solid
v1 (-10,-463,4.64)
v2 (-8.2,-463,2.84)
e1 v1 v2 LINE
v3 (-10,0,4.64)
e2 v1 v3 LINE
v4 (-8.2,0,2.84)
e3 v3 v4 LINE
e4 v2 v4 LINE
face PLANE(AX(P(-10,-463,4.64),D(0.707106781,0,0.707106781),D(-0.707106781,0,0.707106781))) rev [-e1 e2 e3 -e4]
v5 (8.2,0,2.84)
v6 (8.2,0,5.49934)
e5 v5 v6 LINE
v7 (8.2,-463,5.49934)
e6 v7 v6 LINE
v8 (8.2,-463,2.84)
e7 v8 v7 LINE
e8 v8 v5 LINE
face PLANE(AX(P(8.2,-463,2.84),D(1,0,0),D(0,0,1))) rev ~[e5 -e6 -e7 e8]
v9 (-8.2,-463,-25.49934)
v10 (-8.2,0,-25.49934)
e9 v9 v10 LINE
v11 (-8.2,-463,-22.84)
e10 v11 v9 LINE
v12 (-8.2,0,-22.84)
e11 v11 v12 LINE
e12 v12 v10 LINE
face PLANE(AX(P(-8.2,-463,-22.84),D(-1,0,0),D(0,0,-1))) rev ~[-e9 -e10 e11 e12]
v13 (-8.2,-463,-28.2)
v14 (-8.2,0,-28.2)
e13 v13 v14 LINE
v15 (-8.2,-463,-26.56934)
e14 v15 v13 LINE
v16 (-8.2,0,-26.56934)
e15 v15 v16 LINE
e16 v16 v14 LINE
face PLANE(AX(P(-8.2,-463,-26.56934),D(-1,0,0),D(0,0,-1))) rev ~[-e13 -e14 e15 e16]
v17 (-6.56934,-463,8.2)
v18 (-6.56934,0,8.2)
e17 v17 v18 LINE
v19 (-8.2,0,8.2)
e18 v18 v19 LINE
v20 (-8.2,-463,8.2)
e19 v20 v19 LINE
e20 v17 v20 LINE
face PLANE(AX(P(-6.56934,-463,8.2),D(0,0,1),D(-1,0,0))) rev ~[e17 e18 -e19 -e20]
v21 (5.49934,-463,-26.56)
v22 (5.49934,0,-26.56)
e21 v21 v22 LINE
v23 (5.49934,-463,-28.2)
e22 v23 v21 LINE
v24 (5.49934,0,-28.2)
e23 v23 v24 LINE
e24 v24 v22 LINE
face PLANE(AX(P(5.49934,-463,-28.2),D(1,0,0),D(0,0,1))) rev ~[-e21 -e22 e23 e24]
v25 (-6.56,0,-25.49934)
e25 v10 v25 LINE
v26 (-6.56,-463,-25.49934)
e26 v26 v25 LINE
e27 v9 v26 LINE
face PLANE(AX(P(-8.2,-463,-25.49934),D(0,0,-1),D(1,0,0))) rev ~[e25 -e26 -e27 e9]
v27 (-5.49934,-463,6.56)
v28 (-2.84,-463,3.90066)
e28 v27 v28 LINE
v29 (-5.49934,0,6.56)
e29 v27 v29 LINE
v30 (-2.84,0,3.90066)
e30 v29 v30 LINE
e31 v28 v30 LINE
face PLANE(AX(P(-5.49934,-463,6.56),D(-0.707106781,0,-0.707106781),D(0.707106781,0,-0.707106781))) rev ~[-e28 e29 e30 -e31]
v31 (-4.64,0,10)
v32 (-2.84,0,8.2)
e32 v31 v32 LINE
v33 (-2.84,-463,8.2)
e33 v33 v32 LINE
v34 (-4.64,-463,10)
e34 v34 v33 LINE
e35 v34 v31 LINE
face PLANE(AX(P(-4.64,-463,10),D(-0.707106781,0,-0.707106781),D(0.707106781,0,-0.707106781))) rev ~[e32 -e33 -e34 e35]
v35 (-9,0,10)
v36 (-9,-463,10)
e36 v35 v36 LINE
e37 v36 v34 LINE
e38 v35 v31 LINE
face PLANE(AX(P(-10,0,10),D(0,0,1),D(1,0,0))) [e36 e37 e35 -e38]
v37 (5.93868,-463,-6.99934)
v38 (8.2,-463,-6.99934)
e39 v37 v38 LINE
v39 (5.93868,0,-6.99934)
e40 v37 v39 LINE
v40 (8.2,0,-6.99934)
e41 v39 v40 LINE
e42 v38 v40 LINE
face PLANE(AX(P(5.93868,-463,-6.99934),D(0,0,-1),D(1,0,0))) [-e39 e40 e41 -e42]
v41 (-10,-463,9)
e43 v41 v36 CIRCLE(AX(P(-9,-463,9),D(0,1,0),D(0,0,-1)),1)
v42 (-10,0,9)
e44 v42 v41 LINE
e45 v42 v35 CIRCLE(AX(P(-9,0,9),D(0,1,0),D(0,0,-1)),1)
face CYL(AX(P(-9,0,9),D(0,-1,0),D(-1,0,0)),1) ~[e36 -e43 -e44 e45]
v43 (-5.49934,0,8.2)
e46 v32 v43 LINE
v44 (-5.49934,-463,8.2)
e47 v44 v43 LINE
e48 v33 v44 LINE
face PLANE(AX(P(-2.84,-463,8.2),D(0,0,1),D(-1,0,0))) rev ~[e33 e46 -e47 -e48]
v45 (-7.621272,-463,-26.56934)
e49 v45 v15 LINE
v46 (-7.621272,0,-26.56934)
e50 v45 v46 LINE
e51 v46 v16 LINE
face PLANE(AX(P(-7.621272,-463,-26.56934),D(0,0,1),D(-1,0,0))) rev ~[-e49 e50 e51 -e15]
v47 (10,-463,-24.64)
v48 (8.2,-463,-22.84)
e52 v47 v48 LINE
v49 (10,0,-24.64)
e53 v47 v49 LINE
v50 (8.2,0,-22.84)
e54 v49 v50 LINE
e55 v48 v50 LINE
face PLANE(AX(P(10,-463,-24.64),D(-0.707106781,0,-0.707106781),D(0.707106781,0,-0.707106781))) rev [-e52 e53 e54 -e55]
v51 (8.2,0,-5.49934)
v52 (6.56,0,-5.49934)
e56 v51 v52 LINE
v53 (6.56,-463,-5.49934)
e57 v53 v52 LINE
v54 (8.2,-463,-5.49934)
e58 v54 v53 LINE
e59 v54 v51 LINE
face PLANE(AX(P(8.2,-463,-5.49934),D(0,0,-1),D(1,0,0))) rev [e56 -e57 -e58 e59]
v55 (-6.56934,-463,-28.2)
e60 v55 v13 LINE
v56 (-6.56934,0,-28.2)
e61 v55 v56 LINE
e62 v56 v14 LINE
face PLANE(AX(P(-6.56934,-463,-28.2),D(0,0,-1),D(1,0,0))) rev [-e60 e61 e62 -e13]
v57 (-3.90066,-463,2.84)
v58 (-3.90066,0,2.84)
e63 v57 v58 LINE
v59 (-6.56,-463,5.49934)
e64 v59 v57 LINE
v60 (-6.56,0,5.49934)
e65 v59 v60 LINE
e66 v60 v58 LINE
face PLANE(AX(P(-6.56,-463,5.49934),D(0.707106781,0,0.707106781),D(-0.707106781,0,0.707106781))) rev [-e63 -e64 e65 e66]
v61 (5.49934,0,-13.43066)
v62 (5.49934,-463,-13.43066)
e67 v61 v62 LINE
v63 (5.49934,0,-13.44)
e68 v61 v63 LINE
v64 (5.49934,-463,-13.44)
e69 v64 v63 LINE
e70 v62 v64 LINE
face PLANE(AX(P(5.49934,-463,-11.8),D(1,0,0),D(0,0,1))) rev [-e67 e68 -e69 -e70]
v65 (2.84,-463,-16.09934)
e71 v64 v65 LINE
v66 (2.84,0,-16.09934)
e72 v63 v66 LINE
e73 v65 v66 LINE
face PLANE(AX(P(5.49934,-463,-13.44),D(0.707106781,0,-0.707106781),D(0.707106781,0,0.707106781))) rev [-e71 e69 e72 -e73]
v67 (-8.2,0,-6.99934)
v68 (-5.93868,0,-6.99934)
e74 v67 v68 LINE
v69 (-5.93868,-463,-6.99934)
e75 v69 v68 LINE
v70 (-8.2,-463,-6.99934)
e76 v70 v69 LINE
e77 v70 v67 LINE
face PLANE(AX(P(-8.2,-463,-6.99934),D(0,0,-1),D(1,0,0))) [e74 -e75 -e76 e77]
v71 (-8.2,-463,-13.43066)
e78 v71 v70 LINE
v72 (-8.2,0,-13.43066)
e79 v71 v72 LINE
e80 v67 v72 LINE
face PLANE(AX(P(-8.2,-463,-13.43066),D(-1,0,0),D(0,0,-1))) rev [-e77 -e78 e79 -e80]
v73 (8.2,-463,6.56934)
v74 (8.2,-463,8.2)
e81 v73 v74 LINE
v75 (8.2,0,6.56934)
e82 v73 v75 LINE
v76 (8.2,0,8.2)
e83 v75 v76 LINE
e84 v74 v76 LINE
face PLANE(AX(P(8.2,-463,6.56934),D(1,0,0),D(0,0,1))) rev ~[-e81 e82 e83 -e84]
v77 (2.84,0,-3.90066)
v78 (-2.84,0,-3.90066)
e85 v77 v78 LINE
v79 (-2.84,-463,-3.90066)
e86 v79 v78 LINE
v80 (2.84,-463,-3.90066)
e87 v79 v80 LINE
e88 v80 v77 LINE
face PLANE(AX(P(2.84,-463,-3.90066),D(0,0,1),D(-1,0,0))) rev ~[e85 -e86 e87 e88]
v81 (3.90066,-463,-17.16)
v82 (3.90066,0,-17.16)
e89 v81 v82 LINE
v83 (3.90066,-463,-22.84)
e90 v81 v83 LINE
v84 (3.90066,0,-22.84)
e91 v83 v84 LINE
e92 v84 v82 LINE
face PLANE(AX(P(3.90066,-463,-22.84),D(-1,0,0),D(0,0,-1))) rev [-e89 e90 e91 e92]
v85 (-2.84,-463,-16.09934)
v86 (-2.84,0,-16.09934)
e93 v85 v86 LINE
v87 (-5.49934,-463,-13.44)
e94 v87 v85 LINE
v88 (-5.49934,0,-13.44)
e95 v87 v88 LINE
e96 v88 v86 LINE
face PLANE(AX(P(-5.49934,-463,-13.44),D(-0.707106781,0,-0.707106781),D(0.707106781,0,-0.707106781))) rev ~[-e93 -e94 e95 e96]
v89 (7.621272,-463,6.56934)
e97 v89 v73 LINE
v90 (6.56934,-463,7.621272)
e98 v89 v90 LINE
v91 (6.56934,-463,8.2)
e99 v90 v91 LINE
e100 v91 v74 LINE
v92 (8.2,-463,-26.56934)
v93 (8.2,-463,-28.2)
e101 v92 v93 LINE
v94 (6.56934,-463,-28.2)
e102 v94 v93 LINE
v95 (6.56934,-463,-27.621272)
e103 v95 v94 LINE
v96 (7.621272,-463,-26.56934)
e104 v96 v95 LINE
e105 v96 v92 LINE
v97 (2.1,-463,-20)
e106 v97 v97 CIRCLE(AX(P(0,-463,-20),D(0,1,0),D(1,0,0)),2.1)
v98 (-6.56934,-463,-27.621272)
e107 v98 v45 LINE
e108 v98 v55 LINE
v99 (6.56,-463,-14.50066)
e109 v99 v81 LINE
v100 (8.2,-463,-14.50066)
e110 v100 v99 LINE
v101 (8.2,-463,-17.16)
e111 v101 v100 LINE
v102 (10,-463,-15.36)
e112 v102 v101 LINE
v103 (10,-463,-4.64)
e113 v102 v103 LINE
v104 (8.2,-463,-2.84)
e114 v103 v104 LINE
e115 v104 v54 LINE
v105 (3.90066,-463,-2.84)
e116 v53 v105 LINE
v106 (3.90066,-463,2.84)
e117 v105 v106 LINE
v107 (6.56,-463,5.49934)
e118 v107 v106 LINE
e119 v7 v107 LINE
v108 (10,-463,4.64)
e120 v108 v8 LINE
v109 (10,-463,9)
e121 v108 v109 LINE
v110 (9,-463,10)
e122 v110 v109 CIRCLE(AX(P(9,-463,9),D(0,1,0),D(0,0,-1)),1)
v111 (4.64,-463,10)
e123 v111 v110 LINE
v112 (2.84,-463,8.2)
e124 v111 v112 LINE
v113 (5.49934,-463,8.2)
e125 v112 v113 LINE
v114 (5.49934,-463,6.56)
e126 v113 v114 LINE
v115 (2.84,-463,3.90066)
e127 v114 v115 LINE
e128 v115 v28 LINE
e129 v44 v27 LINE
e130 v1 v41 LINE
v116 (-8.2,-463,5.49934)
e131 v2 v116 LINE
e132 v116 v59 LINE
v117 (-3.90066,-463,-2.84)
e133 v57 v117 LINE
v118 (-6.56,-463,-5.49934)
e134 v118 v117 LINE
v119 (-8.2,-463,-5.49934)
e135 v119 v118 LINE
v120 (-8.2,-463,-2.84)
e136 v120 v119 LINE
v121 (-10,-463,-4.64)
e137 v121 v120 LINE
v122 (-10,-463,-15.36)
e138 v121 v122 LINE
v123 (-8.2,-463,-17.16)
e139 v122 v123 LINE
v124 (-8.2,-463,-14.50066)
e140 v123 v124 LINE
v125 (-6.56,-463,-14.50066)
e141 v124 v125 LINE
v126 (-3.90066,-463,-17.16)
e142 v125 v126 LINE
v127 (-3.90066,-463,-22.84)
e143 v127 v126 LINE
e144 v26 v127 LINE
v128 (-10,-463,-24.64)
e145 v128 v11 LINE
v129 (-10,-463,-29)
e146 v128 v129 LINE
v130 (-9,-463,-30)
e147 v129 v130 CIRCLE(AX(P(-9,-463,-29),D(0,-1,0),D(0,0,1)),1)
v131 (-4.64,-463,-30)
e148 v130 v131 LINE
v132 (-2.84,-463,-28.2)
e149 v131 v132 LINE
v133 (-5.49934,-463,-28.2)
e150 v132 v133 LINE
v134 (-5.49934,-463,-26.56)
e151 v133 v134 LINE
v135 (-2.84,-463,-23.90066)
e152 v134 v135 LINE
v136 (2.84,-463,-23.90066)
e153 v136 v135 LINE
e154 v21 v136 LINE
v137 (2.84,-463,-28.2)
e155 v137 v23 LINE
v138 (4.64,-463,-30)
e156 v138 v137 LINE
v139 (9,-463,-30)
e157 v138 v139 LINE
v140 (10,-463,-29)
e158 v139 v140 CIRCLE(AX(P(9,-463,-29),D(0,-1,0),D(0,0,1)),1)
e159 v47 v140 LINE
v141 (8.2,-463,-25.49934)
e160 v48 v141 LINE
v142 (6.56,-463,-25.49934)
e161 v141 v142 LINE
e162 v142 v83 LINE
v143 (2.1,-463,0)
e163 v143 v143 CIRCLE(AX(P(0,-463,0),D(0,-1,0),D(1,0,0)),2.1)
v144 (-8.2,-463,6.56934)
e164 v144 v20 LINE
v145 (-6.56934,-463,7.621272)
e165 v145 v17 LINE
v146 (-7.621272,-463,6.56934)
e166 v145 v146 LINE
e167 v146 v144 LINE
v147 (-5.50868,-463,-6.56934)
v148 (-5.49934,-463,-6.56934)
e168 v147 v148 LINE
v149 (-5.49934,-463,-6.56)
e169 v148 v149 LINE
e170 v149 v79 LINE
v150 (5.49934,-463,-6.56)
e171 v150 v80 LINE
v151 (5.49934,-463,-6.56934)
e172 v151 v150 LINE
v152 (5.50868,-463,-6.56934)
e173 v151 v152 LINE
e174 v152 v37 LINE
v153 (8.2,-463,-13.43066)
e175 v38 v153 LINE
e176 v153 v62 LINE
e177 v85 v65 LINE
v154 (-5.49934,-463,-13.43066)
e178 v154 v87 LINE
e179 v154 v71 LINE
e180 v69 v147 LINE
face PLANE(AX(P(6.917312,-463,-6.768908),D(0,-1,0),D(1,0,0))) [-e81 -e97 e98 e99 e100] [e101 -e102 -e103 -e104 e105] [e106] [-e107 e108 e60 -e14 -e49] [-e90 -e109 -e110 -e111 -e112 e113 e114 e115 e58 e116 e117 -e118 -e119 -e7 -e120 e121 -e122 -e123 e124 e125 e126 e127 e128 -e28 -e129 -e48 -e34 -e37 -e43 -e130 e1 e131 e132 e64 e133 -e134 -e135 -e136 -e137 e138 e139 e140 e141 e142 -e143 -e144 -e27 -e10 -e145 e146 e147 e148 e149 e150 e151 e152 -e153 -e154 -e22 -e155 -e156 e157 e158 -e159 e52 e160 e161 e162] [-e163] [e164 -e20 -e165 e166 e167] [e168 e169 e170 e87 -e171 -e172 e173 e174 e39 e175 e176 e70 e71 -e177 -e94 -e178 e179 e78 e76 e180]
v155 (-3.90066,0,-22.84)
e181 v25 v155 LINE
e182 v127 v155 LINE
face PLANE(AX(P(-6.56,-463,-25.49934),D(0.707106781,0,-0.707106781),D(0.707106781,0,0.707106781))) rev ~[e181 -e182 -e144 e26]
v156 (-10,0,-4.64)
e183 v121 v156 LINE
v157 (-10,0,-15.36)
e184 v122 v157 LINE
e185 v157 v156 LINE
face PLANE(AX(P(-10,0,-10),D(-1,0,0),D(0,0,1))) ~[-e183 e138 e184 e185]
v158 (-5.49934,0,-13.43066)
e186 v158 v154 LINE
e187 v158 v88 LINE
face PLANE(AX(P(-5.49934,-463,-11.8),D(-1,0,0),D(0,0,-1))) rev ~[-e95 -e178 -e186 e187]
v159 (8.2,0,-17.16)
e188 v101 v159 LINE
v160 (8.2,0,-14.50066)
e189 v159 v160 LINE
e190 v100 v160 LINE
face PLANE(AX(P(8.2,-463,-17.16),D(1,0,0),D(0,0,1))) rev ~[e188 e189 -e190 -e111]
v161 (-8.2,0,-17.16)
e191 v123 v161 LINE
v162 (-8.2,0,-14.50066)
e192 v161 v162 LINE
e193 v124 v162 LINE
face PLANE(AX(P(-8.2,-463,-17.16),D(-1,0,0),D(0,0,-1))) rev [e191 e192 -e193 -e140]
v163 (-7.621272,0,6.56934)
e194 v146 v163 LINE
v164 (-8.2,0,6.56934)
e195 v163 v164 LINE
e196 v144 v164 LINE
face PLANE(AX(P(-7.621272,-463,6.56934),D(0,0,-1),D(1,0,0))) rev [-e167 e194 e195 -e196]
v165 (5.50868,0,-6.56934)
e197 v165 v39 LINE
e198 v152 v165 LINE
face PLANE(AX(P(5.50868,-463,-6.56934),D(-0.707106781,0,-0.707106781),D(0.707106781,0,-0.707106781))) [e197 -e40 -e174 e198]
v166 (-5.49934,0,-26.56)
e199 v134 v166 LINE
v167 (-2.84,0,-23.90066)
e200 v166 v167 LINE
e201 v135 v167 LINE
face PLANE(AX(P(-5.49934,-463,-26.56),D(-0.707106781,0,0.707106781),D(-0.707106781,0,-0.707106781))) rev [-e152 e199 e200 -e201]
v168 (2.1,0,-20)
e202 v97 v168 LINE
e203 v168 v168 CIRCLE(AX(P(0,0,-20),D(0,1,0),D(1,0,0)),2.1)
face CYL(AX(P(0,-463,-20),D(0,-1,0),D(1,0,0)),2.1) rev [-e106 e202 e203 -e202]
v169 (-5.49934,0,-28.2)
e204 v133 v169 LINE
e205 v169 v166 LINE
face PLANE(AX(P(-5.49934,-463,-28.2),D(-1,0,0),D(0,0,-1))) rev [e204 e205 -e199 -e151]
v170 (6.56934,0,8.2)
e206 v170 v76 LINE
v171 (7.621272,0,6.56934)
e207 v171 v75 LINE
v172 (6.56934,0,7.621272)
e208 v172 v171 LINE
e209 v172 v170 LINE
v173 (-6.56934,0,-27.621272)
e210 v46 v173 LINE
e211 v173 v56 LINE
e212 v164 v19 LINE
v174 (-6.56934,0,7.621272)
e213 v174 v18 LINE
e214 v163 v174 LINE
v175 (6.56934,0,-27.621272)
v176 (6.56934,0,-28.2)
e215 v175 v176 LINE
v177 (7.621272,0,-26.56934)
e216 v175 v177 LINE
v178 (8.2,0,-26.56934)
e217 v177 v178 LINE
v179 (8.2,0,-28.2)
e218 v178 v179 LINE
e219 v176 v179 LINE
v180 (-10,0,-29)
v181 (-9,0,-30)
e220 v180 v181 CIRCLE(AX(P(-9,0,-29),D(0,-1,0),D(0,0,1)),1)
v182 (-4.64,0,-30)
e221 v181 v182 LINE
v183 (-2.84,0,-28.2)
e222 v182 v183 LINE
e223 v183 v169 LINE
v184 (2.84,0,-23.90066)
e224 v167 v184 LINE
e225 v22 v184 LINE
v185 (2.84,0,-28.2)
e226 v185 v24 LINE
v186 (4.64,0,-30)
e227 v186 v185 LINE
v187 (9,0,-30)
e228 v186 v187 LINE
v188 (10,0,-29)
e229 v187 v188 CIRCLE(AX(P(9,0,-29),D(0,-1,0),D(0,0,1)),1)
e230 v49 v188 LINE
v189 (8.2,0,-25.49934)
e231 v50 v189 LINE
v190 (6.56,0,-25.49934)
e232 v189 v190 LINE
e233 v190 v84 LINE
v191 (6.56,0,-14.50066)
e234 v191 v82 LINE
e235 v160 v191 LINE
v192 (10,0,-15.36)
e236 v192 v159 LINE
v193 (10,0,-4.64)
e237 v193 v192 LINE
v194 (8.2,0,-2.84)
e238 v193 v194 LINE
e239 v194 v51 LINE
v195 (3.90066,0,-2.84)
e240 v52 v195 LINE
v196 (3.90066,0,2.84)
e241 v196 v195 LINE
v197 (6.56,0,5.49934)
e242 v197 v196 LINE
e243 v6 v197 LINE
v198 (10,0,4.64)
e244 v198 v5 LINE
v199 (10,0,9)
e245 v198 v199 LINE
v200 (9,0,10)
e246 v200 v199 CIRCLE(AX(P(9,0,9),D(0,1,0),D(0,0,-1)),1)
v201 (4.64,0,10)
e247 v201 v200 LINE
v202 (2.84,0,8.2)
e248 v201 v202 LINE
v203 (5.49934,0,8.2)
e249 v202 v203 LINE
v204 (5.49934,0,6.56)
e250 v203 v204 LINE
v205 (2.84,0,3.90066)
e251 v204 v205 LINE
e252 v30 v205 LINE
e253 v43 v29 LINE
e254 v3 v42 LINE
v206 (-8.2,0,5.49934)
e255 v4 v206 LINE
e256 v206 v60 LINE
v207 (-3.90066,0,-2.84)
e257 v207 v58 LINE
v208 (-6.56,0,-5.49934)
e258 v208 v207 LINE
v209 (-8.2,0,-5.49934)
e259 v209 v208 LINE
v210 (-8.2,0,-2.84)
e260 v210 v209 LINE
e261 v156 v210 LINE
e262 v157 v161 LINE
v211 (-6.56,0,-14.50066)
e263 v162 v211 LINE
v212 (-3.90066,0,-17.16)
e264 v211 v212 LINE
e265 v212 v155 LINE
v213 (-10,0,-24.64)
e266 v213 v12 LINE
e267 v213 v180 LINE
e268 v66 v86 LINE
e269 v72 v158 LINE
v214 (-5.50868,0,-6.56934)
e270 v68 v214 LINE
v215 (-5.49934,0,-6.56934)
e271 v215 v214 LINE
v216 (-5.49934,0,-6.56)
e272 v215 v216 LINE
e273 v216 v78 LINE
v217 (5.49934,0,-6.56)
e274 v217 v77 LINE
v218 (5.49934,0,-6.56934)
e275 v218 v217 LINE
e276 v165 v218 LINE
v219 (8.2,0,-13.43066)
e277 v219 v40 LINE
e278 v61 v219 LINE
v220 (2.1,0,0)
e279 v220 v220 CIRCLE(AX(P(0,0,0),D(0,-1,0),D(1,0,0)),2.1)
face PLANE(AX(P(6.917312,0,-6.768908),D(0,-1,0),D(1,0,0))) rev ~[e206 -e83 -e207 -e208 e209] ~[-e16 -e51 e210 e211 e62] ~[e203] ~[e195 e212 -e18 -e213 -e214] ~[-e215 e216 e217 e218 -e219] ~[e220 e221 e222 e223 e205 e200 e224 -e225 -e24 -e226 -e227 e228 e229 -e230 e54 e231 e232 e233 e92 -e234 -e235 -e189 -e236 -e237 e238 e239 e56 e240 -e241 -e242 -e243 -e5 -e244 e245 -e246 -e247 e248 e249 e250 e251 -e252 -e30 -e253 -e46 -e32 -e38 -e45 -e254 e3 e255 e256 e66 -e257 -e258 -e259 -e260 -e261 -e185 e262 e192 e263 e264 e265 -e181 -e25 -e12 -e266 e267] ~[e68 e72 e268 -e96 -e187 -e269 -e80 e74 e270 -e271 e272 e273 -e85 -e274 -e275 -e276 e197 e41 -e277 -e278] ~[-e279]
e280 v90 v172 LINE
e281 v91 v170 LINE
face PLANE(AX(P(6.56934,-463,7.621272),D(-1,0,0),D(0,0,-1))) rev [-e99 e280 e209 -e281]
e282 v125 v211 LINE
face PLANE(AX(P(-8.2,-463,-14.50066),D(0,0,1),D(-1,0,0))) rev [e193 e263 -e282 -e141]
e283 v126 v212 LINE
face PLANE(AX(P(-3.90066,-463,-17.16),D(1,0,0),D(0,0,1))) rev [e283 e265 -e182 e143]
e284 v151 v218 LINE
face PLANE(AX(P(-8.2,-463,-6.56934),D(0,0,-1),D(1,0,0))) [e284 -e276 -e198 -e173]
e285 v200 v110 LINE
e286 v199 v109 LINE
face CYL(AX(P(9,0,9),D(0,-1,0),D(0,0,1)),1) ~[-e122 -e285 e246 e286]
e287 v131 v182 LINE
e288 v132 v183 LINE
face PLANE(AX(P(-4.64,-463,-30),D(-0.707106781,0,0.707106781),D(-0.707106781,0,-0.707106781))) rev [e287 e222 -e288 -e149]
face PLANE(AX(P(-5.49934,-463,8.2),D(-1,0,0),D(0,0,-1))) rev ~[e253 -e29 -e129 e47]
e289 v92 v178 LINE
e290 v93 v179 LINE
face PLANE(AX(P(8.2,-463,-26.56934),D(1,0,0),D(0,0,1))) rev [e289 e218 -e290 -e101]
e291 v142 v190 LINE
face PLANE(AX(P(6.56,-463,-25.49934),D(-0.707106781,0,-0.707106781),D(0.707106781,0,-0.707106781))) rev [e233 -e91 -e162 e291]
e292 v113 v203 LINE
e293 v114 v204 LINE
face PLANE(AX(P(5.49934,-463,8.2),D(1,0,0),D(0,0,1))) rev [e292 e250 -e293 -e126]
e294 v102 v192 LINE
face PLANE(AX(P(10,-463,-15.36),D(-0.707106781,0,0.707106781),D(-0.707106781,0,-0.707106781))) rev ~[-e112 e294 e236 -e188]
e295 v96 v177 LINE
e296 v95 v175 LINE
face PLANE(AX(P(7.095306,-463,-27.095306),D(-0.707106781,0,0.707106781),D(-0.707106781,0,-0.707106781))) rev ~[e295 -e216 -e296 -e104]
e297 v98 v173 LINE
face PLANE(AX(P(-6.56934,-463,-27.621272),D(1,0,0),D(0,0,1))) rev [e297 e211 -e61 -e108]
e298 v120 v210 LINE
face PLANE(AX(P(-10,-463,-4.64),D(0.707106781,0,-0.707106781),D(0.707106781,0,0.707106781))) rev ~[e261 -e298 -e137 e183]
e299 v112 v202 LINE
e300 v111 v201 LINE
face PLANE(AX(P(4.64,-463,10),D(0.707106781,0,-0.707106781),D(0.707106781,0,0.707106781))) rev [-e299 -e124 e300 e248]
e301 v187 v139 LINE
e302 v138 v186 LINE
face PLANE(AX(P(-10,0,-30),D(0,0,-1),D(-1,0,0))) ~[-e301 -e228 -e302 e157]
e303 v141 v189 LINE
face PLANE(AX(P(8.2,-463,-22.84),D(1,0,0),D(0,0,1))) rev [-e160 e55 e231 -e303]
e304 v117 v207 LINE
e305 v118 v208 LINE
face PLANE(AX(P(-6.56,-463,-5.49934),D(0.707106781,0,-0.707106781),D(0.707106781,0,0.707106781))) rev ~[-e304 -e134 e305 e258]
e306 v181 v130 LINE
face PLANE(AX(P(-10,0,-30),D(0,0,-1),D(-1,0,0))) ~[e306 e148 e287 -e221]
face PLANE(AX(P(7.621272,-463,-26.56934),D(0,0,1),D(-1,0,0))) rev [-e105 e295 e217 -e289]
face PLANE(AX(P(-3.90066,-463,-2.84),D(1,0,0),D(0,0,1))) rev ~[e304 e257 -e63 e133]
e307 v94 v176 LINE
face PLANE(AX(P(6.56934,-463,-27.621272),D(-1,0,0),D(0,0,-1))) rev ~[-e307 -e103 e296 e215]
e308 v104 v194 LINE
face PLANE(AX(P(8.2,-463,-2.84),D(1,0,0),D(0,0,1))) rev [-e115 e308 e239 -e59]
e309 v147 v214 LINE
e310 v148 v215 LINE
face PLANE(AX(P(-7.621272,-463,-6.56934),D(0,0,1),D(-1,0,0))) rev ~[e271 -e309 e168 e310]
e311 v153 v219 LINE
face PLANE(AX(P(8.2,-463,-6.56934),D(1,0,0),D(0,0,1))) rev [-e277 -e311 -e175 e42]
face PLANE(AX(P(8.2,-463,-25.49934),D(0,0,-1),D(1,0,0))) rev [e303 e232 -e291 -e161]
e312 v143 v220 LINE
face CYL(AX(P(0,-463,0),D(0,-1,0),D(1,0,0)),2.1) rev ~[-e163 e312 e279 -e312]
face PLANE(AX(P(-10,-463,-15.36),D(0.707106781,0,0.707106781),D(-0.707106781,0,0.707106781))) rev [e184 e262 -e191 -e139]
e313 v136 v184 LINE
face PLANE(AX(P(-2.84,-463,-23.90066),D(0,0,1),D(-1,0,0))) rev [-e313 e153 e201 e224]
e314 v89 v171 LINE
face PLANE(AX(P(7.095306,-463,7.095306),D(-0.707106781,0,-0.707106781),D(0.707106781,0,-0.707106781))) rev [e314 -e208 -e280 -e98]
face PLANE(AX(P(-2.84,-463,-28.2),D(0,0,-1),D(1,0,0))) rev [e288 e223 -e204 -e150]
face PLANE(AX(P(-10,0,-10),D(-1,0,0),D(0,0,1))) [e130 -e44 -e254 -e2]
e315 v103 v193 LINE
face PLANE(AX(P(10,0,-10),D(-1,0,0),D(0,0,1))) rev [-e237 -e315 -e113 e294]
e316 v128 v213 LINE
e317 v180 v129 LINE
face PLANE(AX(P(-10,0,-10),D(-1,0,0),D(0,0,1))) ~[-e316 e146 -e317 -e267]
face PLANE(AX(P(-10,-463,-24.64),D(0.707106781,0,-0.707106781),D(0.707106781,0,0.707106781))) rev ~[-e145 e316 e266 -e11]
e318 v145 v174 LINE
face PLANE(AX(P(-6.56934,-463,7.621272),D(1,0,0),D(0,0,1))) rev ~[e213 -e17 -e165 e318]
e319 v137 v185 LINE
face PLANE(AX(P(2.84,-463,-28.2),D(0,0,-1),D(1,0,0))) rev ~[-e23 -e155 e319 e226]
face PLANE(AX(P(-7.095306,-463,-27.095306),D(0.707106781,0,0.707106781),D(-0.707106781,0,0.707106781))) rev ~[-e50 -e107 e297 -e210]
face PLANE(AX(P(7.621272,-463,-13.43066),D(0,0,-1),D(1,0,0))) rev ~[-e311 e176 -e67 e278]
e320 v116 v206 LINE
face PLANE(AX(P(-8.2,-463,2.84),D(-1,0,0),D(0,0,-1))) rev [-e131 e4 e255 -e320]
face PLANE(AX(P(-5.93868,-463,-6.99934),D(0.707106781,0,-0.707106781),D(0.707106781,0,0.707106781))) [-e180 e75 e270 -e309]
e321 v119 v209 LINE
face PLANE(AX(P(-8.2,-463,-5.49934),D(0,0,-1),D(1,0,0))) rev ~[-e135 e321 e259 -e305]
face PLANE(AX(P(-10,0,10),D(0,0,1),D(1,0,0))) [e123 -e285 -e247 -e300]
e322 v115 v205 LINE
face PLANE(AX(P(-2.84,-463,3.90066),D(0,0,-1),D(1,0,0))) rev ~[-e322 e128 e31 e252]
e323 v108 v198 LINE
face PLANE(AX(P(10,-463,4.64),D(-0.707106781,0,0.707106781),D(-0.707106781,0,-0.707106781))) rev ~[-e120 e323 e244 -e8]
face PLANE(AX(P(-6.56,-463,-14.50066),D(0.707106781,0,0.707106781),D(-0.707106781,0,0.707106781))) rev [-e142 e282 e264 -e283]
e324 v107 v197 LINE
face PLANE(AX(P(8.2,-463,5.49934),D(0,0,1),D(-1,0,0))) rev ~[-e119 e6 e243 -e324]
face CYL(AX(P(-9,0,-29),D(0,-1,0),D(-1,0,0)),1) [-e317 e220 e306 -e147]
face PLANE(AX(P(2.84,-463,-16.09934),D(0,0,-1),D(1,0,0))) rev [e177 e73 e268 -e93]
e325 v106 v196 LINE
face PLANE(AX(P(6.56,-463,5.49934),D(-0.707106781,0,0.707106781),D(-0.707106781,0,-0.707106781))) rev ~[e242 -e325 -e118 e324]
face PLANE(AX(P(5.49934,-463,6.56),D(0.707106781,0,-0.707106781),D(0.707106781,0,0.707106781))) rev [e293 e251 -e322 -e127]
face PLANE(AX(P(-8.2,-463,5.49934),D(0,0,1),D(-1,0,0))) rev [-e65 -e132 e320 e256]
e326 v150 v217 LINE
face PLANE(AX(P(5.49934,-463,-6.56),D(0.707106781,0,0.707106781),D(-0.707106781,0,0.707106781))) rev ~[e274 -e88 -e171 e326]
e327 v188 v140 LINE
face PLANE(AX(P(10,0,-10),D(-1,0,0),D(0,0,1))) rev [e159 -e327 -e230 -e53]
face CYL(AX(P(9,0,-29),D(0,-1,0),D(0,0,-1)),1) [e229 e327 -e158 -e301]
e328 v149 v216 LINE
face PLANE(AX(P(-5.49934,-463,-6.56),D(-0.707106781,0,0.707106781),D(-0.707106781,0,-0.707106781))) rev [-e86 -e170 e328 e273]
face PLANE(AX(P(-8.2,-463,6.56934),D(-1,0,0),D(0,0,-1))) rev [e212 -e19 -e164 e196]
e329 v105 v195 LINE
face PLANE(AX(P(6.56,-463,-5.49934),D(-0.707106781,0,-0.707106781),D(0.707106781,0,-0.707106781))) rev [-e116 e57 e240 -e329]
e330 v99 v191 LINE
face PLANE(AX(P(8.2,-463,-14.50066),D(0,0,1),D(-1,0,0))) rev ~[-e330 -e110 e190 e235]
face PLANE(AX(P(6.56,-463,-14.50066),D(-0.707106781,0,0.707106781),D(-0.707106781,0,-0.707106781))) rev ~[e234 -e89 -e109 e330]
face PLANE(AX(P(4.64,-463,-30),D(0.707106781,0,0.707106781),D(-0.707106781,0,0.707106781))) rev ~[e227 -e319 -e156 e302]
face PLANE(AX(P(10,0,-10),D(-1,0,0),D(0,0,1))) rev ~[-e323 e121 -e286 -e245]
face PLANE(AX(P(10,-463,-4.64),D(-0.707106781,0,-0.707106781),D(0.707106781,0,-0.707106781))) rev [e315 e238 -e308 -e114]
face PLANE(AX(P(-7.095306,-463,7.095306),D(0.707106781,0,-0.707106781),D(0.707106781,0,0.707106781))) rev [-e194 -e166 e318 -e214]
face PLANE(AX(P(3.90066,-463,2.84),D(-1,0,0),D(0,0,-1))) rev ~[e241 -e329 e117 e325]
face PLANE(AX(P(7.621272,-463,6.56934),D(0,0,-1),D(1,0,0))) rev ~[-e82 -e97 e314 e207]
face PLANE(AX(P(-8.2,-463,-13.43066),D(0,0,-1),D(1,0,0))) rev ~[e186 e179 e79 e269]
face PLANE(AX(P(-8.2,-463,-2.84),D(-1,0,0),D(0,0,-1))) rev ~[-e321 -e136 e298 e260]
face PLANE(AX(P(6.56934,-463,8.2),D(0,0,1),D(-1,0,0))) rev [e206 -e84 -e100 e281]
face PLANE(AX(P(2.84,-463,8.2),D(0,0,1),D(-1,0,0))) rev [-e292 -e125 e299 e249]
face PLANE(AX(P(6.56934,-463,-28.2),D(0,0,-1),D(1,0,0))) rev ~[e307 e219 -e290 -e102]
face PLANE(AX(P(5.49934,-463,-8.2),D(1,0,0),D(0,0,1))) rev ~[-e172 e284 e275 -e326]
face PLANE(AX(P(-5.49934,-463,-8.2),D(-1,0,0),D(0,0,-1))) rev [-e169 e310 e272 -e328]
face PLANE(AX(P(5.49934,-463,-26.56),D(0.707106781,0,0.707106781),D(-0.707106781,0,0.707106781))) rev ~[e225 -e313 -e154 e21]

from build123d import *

# Parameters (mm, degrees)
F0_W             = 20
F0_H             = 20
F1_DEPTH         = 463
F2_R             = 2.1
F3_DEPTH         = 463.001
F4_R             = 1
F6_DEPTH         = 463.001
F6_COPIES3_COUNT = 2
F6_COPIES3_ANGLE = 90
F6_COPIES4_COUNT = 2
F6_COPIES4_ANGLE = 270
F6_COPIES6_COUNT = 2
F9_W             = 16.4
F9_H             = 6.8613203436
F10_DEPTH        = 463.001
F12_DEPTH        = 463


# Not quite as in the source:
# - a pattern or mirror of a feature is missing from the dataset's text; its kind, count and spacing are read off the source's solid


with BuildPart() as f1:
    # F0 (on Front) → F1 (new body)
    with BuildSketch(Plane.XZ):
        Rectangle(F0_W, F0_H)
    extrude(amount=F1_DEPTH)

    # F2 (on face) → F3 (cut, through all)
    with BuildSketch(Plane.XZ.offset(463)):
        Circle(F2_R)
    extrude(amount=-F3_DEPTH, mode=Mode.SUBTRACT)

    # F4
    f4_edges = [f1.edges().sort_by_distance(p)[0] for p in [
        (-10, -231.5, 10),
        (10, -231.5, 10),
    ]]
    fillet(f4_edges, radius=F4_R)

    # F5 (on face) → F6 (cut, through all)
    with BuildSketch(Plane.XZ.offset(463)):
        Polygon((0, 3.9006601718), (0, 10), (-2.84, 10), (-4.64, 10), (-2.84, 8.2), (-5.4993398282, 8.2), (-5.4993398282, 6.56), (-2.84, 3.9006601718), align=None)
        Polygon((-6.5693398282, 8.2), (-8.2, 8.2), (-7.0953059148, 7.0953059148), (-6.5693398282, 7.6212720014), align=None)
    f6 = extrude(amount=-F6_DEPTH, mode=Mode.SUBTRACT)

    # F6_copies: F6 across plane
    add(f6.mirror(Plane(origin=(0, 0, 0), x_dir=(-0.7071067812, 0, -0.7071067812), z_dir=(0.7071067812, 0, -0.7071067812))), mode=Mode.SUBTRACT)

    # F6_copies1: F6 across plane
    add(f6.mirror(Plane(origin=(0, 0, 0), x_dir=(0.7071067812, 0, -0.7071067812), z_dir=(-0.7071067812, 0, -0.7071067812))), mode=Mode.SUBTRACT)

    # F6_copies2: F6 across plane
    add(f6.mirror(Plane(origin=(0, 0, 0), x_dir=(0, 0, 1), z_dir=(1, 0, 0))), mode=Mode.SUBTRACT)

    # F6_copies3: F6 ×2 about axis
    f6_copies3_axis = Axis((0, 0, 0), (0, 1, 0))
    for i in range(1, F6_COPIES3_COUNT):
        add(f6.rotate(f6_copies3_axis, i * F6_COPIES3_ANGLE / (F6_COPIES3_COUNT - 1)), mode=Mode.SUBTRACT)

    # F6_copies4: F6 ×2 about axis
    f6_copies4_axis = Axis((0, 0, 0), (0, 1, 0))
    for i in range(1, F6_COPIES4_COUNT):
        add(f6.rotate(f6_copies4_axis, i * F6_COPIES4_ANGLE / (F6_COPIES4_COUNT - 1)), mode=Mode.SUBTRACT)

    # F6_copies5: F6 across plane
    add(f6.mirror(Plane(origin=(0, 0, 0), x_dir=(-1, 0, 0), z_dir=(0, 0, -1))), mode=Mode.SUBTRACT)

    # F6_copies6: F6 ×2 about axis
    f6_copies6_axis = Axis((0, 0, 0), (0, 1, 0))
    for i in range(1, F6_COPIES6_COUNT):
        add(f6.rotate(f6_copies6_axis, i * 360 / F6_COPIES6_COUNT), mode=Mode.SUBTRACT)

    # F8: F1 across face


with BuildPart() as f1_1:
    add(f1.part)
    add(f1.part.mirror(Plane(origin=(-7.32, -231.5, -10), x_dir=(1, 0, 0), z_dir=(0, 0, -1))))

    # F9 (on face) → F10 (cut, through all)
    with BuildSketch(Plane.XZ.offset(463)):
        with Locations((0, -10)):
            Rectangle(F9_W, F9_H)
    extrude(amount=-F10_DEPTH, mode=Mode.SUBTRACT)

    # F11 (on face) → F12 (join, through all)
    with BuildSketch(Plane.XZ.offset(463)):
        with BuildLine():
            ThreePointArc((-9, -10), (-9.7071067812, -9.7071067812), (-10, -9))
            Line((-10, -9), (-10, -11))
            ThreePointArc((-10, -11), (-9.7071067812, -10.2928932188), (-9, -10))
        make_face()
        with BuildLine():
            ThreePointArc((10, -9), (9.7071067812, -9.7071067812), (9, -10))
            ThreePointArc((9, -10), (9.7071067812, -10.2928932188), (10, -11))
            Line((10, -11), (10, -9))
        make_face()
        Polygon((5.9386796564, -6.9993398282), (8.2, -6.9993398282), (8.2, -6.5693398282), (5.5086796564, -6.5693398282), align=None)
        Polygon((-8.2, -6.5693398282), (-8.2, -6.9993398282), (-5.9386796564, -6.9993398282), (-5.5086796564, -6.5693398282), align=None)
    extrude(amount=-F12_DEPTH)


solid = f1_1.part
